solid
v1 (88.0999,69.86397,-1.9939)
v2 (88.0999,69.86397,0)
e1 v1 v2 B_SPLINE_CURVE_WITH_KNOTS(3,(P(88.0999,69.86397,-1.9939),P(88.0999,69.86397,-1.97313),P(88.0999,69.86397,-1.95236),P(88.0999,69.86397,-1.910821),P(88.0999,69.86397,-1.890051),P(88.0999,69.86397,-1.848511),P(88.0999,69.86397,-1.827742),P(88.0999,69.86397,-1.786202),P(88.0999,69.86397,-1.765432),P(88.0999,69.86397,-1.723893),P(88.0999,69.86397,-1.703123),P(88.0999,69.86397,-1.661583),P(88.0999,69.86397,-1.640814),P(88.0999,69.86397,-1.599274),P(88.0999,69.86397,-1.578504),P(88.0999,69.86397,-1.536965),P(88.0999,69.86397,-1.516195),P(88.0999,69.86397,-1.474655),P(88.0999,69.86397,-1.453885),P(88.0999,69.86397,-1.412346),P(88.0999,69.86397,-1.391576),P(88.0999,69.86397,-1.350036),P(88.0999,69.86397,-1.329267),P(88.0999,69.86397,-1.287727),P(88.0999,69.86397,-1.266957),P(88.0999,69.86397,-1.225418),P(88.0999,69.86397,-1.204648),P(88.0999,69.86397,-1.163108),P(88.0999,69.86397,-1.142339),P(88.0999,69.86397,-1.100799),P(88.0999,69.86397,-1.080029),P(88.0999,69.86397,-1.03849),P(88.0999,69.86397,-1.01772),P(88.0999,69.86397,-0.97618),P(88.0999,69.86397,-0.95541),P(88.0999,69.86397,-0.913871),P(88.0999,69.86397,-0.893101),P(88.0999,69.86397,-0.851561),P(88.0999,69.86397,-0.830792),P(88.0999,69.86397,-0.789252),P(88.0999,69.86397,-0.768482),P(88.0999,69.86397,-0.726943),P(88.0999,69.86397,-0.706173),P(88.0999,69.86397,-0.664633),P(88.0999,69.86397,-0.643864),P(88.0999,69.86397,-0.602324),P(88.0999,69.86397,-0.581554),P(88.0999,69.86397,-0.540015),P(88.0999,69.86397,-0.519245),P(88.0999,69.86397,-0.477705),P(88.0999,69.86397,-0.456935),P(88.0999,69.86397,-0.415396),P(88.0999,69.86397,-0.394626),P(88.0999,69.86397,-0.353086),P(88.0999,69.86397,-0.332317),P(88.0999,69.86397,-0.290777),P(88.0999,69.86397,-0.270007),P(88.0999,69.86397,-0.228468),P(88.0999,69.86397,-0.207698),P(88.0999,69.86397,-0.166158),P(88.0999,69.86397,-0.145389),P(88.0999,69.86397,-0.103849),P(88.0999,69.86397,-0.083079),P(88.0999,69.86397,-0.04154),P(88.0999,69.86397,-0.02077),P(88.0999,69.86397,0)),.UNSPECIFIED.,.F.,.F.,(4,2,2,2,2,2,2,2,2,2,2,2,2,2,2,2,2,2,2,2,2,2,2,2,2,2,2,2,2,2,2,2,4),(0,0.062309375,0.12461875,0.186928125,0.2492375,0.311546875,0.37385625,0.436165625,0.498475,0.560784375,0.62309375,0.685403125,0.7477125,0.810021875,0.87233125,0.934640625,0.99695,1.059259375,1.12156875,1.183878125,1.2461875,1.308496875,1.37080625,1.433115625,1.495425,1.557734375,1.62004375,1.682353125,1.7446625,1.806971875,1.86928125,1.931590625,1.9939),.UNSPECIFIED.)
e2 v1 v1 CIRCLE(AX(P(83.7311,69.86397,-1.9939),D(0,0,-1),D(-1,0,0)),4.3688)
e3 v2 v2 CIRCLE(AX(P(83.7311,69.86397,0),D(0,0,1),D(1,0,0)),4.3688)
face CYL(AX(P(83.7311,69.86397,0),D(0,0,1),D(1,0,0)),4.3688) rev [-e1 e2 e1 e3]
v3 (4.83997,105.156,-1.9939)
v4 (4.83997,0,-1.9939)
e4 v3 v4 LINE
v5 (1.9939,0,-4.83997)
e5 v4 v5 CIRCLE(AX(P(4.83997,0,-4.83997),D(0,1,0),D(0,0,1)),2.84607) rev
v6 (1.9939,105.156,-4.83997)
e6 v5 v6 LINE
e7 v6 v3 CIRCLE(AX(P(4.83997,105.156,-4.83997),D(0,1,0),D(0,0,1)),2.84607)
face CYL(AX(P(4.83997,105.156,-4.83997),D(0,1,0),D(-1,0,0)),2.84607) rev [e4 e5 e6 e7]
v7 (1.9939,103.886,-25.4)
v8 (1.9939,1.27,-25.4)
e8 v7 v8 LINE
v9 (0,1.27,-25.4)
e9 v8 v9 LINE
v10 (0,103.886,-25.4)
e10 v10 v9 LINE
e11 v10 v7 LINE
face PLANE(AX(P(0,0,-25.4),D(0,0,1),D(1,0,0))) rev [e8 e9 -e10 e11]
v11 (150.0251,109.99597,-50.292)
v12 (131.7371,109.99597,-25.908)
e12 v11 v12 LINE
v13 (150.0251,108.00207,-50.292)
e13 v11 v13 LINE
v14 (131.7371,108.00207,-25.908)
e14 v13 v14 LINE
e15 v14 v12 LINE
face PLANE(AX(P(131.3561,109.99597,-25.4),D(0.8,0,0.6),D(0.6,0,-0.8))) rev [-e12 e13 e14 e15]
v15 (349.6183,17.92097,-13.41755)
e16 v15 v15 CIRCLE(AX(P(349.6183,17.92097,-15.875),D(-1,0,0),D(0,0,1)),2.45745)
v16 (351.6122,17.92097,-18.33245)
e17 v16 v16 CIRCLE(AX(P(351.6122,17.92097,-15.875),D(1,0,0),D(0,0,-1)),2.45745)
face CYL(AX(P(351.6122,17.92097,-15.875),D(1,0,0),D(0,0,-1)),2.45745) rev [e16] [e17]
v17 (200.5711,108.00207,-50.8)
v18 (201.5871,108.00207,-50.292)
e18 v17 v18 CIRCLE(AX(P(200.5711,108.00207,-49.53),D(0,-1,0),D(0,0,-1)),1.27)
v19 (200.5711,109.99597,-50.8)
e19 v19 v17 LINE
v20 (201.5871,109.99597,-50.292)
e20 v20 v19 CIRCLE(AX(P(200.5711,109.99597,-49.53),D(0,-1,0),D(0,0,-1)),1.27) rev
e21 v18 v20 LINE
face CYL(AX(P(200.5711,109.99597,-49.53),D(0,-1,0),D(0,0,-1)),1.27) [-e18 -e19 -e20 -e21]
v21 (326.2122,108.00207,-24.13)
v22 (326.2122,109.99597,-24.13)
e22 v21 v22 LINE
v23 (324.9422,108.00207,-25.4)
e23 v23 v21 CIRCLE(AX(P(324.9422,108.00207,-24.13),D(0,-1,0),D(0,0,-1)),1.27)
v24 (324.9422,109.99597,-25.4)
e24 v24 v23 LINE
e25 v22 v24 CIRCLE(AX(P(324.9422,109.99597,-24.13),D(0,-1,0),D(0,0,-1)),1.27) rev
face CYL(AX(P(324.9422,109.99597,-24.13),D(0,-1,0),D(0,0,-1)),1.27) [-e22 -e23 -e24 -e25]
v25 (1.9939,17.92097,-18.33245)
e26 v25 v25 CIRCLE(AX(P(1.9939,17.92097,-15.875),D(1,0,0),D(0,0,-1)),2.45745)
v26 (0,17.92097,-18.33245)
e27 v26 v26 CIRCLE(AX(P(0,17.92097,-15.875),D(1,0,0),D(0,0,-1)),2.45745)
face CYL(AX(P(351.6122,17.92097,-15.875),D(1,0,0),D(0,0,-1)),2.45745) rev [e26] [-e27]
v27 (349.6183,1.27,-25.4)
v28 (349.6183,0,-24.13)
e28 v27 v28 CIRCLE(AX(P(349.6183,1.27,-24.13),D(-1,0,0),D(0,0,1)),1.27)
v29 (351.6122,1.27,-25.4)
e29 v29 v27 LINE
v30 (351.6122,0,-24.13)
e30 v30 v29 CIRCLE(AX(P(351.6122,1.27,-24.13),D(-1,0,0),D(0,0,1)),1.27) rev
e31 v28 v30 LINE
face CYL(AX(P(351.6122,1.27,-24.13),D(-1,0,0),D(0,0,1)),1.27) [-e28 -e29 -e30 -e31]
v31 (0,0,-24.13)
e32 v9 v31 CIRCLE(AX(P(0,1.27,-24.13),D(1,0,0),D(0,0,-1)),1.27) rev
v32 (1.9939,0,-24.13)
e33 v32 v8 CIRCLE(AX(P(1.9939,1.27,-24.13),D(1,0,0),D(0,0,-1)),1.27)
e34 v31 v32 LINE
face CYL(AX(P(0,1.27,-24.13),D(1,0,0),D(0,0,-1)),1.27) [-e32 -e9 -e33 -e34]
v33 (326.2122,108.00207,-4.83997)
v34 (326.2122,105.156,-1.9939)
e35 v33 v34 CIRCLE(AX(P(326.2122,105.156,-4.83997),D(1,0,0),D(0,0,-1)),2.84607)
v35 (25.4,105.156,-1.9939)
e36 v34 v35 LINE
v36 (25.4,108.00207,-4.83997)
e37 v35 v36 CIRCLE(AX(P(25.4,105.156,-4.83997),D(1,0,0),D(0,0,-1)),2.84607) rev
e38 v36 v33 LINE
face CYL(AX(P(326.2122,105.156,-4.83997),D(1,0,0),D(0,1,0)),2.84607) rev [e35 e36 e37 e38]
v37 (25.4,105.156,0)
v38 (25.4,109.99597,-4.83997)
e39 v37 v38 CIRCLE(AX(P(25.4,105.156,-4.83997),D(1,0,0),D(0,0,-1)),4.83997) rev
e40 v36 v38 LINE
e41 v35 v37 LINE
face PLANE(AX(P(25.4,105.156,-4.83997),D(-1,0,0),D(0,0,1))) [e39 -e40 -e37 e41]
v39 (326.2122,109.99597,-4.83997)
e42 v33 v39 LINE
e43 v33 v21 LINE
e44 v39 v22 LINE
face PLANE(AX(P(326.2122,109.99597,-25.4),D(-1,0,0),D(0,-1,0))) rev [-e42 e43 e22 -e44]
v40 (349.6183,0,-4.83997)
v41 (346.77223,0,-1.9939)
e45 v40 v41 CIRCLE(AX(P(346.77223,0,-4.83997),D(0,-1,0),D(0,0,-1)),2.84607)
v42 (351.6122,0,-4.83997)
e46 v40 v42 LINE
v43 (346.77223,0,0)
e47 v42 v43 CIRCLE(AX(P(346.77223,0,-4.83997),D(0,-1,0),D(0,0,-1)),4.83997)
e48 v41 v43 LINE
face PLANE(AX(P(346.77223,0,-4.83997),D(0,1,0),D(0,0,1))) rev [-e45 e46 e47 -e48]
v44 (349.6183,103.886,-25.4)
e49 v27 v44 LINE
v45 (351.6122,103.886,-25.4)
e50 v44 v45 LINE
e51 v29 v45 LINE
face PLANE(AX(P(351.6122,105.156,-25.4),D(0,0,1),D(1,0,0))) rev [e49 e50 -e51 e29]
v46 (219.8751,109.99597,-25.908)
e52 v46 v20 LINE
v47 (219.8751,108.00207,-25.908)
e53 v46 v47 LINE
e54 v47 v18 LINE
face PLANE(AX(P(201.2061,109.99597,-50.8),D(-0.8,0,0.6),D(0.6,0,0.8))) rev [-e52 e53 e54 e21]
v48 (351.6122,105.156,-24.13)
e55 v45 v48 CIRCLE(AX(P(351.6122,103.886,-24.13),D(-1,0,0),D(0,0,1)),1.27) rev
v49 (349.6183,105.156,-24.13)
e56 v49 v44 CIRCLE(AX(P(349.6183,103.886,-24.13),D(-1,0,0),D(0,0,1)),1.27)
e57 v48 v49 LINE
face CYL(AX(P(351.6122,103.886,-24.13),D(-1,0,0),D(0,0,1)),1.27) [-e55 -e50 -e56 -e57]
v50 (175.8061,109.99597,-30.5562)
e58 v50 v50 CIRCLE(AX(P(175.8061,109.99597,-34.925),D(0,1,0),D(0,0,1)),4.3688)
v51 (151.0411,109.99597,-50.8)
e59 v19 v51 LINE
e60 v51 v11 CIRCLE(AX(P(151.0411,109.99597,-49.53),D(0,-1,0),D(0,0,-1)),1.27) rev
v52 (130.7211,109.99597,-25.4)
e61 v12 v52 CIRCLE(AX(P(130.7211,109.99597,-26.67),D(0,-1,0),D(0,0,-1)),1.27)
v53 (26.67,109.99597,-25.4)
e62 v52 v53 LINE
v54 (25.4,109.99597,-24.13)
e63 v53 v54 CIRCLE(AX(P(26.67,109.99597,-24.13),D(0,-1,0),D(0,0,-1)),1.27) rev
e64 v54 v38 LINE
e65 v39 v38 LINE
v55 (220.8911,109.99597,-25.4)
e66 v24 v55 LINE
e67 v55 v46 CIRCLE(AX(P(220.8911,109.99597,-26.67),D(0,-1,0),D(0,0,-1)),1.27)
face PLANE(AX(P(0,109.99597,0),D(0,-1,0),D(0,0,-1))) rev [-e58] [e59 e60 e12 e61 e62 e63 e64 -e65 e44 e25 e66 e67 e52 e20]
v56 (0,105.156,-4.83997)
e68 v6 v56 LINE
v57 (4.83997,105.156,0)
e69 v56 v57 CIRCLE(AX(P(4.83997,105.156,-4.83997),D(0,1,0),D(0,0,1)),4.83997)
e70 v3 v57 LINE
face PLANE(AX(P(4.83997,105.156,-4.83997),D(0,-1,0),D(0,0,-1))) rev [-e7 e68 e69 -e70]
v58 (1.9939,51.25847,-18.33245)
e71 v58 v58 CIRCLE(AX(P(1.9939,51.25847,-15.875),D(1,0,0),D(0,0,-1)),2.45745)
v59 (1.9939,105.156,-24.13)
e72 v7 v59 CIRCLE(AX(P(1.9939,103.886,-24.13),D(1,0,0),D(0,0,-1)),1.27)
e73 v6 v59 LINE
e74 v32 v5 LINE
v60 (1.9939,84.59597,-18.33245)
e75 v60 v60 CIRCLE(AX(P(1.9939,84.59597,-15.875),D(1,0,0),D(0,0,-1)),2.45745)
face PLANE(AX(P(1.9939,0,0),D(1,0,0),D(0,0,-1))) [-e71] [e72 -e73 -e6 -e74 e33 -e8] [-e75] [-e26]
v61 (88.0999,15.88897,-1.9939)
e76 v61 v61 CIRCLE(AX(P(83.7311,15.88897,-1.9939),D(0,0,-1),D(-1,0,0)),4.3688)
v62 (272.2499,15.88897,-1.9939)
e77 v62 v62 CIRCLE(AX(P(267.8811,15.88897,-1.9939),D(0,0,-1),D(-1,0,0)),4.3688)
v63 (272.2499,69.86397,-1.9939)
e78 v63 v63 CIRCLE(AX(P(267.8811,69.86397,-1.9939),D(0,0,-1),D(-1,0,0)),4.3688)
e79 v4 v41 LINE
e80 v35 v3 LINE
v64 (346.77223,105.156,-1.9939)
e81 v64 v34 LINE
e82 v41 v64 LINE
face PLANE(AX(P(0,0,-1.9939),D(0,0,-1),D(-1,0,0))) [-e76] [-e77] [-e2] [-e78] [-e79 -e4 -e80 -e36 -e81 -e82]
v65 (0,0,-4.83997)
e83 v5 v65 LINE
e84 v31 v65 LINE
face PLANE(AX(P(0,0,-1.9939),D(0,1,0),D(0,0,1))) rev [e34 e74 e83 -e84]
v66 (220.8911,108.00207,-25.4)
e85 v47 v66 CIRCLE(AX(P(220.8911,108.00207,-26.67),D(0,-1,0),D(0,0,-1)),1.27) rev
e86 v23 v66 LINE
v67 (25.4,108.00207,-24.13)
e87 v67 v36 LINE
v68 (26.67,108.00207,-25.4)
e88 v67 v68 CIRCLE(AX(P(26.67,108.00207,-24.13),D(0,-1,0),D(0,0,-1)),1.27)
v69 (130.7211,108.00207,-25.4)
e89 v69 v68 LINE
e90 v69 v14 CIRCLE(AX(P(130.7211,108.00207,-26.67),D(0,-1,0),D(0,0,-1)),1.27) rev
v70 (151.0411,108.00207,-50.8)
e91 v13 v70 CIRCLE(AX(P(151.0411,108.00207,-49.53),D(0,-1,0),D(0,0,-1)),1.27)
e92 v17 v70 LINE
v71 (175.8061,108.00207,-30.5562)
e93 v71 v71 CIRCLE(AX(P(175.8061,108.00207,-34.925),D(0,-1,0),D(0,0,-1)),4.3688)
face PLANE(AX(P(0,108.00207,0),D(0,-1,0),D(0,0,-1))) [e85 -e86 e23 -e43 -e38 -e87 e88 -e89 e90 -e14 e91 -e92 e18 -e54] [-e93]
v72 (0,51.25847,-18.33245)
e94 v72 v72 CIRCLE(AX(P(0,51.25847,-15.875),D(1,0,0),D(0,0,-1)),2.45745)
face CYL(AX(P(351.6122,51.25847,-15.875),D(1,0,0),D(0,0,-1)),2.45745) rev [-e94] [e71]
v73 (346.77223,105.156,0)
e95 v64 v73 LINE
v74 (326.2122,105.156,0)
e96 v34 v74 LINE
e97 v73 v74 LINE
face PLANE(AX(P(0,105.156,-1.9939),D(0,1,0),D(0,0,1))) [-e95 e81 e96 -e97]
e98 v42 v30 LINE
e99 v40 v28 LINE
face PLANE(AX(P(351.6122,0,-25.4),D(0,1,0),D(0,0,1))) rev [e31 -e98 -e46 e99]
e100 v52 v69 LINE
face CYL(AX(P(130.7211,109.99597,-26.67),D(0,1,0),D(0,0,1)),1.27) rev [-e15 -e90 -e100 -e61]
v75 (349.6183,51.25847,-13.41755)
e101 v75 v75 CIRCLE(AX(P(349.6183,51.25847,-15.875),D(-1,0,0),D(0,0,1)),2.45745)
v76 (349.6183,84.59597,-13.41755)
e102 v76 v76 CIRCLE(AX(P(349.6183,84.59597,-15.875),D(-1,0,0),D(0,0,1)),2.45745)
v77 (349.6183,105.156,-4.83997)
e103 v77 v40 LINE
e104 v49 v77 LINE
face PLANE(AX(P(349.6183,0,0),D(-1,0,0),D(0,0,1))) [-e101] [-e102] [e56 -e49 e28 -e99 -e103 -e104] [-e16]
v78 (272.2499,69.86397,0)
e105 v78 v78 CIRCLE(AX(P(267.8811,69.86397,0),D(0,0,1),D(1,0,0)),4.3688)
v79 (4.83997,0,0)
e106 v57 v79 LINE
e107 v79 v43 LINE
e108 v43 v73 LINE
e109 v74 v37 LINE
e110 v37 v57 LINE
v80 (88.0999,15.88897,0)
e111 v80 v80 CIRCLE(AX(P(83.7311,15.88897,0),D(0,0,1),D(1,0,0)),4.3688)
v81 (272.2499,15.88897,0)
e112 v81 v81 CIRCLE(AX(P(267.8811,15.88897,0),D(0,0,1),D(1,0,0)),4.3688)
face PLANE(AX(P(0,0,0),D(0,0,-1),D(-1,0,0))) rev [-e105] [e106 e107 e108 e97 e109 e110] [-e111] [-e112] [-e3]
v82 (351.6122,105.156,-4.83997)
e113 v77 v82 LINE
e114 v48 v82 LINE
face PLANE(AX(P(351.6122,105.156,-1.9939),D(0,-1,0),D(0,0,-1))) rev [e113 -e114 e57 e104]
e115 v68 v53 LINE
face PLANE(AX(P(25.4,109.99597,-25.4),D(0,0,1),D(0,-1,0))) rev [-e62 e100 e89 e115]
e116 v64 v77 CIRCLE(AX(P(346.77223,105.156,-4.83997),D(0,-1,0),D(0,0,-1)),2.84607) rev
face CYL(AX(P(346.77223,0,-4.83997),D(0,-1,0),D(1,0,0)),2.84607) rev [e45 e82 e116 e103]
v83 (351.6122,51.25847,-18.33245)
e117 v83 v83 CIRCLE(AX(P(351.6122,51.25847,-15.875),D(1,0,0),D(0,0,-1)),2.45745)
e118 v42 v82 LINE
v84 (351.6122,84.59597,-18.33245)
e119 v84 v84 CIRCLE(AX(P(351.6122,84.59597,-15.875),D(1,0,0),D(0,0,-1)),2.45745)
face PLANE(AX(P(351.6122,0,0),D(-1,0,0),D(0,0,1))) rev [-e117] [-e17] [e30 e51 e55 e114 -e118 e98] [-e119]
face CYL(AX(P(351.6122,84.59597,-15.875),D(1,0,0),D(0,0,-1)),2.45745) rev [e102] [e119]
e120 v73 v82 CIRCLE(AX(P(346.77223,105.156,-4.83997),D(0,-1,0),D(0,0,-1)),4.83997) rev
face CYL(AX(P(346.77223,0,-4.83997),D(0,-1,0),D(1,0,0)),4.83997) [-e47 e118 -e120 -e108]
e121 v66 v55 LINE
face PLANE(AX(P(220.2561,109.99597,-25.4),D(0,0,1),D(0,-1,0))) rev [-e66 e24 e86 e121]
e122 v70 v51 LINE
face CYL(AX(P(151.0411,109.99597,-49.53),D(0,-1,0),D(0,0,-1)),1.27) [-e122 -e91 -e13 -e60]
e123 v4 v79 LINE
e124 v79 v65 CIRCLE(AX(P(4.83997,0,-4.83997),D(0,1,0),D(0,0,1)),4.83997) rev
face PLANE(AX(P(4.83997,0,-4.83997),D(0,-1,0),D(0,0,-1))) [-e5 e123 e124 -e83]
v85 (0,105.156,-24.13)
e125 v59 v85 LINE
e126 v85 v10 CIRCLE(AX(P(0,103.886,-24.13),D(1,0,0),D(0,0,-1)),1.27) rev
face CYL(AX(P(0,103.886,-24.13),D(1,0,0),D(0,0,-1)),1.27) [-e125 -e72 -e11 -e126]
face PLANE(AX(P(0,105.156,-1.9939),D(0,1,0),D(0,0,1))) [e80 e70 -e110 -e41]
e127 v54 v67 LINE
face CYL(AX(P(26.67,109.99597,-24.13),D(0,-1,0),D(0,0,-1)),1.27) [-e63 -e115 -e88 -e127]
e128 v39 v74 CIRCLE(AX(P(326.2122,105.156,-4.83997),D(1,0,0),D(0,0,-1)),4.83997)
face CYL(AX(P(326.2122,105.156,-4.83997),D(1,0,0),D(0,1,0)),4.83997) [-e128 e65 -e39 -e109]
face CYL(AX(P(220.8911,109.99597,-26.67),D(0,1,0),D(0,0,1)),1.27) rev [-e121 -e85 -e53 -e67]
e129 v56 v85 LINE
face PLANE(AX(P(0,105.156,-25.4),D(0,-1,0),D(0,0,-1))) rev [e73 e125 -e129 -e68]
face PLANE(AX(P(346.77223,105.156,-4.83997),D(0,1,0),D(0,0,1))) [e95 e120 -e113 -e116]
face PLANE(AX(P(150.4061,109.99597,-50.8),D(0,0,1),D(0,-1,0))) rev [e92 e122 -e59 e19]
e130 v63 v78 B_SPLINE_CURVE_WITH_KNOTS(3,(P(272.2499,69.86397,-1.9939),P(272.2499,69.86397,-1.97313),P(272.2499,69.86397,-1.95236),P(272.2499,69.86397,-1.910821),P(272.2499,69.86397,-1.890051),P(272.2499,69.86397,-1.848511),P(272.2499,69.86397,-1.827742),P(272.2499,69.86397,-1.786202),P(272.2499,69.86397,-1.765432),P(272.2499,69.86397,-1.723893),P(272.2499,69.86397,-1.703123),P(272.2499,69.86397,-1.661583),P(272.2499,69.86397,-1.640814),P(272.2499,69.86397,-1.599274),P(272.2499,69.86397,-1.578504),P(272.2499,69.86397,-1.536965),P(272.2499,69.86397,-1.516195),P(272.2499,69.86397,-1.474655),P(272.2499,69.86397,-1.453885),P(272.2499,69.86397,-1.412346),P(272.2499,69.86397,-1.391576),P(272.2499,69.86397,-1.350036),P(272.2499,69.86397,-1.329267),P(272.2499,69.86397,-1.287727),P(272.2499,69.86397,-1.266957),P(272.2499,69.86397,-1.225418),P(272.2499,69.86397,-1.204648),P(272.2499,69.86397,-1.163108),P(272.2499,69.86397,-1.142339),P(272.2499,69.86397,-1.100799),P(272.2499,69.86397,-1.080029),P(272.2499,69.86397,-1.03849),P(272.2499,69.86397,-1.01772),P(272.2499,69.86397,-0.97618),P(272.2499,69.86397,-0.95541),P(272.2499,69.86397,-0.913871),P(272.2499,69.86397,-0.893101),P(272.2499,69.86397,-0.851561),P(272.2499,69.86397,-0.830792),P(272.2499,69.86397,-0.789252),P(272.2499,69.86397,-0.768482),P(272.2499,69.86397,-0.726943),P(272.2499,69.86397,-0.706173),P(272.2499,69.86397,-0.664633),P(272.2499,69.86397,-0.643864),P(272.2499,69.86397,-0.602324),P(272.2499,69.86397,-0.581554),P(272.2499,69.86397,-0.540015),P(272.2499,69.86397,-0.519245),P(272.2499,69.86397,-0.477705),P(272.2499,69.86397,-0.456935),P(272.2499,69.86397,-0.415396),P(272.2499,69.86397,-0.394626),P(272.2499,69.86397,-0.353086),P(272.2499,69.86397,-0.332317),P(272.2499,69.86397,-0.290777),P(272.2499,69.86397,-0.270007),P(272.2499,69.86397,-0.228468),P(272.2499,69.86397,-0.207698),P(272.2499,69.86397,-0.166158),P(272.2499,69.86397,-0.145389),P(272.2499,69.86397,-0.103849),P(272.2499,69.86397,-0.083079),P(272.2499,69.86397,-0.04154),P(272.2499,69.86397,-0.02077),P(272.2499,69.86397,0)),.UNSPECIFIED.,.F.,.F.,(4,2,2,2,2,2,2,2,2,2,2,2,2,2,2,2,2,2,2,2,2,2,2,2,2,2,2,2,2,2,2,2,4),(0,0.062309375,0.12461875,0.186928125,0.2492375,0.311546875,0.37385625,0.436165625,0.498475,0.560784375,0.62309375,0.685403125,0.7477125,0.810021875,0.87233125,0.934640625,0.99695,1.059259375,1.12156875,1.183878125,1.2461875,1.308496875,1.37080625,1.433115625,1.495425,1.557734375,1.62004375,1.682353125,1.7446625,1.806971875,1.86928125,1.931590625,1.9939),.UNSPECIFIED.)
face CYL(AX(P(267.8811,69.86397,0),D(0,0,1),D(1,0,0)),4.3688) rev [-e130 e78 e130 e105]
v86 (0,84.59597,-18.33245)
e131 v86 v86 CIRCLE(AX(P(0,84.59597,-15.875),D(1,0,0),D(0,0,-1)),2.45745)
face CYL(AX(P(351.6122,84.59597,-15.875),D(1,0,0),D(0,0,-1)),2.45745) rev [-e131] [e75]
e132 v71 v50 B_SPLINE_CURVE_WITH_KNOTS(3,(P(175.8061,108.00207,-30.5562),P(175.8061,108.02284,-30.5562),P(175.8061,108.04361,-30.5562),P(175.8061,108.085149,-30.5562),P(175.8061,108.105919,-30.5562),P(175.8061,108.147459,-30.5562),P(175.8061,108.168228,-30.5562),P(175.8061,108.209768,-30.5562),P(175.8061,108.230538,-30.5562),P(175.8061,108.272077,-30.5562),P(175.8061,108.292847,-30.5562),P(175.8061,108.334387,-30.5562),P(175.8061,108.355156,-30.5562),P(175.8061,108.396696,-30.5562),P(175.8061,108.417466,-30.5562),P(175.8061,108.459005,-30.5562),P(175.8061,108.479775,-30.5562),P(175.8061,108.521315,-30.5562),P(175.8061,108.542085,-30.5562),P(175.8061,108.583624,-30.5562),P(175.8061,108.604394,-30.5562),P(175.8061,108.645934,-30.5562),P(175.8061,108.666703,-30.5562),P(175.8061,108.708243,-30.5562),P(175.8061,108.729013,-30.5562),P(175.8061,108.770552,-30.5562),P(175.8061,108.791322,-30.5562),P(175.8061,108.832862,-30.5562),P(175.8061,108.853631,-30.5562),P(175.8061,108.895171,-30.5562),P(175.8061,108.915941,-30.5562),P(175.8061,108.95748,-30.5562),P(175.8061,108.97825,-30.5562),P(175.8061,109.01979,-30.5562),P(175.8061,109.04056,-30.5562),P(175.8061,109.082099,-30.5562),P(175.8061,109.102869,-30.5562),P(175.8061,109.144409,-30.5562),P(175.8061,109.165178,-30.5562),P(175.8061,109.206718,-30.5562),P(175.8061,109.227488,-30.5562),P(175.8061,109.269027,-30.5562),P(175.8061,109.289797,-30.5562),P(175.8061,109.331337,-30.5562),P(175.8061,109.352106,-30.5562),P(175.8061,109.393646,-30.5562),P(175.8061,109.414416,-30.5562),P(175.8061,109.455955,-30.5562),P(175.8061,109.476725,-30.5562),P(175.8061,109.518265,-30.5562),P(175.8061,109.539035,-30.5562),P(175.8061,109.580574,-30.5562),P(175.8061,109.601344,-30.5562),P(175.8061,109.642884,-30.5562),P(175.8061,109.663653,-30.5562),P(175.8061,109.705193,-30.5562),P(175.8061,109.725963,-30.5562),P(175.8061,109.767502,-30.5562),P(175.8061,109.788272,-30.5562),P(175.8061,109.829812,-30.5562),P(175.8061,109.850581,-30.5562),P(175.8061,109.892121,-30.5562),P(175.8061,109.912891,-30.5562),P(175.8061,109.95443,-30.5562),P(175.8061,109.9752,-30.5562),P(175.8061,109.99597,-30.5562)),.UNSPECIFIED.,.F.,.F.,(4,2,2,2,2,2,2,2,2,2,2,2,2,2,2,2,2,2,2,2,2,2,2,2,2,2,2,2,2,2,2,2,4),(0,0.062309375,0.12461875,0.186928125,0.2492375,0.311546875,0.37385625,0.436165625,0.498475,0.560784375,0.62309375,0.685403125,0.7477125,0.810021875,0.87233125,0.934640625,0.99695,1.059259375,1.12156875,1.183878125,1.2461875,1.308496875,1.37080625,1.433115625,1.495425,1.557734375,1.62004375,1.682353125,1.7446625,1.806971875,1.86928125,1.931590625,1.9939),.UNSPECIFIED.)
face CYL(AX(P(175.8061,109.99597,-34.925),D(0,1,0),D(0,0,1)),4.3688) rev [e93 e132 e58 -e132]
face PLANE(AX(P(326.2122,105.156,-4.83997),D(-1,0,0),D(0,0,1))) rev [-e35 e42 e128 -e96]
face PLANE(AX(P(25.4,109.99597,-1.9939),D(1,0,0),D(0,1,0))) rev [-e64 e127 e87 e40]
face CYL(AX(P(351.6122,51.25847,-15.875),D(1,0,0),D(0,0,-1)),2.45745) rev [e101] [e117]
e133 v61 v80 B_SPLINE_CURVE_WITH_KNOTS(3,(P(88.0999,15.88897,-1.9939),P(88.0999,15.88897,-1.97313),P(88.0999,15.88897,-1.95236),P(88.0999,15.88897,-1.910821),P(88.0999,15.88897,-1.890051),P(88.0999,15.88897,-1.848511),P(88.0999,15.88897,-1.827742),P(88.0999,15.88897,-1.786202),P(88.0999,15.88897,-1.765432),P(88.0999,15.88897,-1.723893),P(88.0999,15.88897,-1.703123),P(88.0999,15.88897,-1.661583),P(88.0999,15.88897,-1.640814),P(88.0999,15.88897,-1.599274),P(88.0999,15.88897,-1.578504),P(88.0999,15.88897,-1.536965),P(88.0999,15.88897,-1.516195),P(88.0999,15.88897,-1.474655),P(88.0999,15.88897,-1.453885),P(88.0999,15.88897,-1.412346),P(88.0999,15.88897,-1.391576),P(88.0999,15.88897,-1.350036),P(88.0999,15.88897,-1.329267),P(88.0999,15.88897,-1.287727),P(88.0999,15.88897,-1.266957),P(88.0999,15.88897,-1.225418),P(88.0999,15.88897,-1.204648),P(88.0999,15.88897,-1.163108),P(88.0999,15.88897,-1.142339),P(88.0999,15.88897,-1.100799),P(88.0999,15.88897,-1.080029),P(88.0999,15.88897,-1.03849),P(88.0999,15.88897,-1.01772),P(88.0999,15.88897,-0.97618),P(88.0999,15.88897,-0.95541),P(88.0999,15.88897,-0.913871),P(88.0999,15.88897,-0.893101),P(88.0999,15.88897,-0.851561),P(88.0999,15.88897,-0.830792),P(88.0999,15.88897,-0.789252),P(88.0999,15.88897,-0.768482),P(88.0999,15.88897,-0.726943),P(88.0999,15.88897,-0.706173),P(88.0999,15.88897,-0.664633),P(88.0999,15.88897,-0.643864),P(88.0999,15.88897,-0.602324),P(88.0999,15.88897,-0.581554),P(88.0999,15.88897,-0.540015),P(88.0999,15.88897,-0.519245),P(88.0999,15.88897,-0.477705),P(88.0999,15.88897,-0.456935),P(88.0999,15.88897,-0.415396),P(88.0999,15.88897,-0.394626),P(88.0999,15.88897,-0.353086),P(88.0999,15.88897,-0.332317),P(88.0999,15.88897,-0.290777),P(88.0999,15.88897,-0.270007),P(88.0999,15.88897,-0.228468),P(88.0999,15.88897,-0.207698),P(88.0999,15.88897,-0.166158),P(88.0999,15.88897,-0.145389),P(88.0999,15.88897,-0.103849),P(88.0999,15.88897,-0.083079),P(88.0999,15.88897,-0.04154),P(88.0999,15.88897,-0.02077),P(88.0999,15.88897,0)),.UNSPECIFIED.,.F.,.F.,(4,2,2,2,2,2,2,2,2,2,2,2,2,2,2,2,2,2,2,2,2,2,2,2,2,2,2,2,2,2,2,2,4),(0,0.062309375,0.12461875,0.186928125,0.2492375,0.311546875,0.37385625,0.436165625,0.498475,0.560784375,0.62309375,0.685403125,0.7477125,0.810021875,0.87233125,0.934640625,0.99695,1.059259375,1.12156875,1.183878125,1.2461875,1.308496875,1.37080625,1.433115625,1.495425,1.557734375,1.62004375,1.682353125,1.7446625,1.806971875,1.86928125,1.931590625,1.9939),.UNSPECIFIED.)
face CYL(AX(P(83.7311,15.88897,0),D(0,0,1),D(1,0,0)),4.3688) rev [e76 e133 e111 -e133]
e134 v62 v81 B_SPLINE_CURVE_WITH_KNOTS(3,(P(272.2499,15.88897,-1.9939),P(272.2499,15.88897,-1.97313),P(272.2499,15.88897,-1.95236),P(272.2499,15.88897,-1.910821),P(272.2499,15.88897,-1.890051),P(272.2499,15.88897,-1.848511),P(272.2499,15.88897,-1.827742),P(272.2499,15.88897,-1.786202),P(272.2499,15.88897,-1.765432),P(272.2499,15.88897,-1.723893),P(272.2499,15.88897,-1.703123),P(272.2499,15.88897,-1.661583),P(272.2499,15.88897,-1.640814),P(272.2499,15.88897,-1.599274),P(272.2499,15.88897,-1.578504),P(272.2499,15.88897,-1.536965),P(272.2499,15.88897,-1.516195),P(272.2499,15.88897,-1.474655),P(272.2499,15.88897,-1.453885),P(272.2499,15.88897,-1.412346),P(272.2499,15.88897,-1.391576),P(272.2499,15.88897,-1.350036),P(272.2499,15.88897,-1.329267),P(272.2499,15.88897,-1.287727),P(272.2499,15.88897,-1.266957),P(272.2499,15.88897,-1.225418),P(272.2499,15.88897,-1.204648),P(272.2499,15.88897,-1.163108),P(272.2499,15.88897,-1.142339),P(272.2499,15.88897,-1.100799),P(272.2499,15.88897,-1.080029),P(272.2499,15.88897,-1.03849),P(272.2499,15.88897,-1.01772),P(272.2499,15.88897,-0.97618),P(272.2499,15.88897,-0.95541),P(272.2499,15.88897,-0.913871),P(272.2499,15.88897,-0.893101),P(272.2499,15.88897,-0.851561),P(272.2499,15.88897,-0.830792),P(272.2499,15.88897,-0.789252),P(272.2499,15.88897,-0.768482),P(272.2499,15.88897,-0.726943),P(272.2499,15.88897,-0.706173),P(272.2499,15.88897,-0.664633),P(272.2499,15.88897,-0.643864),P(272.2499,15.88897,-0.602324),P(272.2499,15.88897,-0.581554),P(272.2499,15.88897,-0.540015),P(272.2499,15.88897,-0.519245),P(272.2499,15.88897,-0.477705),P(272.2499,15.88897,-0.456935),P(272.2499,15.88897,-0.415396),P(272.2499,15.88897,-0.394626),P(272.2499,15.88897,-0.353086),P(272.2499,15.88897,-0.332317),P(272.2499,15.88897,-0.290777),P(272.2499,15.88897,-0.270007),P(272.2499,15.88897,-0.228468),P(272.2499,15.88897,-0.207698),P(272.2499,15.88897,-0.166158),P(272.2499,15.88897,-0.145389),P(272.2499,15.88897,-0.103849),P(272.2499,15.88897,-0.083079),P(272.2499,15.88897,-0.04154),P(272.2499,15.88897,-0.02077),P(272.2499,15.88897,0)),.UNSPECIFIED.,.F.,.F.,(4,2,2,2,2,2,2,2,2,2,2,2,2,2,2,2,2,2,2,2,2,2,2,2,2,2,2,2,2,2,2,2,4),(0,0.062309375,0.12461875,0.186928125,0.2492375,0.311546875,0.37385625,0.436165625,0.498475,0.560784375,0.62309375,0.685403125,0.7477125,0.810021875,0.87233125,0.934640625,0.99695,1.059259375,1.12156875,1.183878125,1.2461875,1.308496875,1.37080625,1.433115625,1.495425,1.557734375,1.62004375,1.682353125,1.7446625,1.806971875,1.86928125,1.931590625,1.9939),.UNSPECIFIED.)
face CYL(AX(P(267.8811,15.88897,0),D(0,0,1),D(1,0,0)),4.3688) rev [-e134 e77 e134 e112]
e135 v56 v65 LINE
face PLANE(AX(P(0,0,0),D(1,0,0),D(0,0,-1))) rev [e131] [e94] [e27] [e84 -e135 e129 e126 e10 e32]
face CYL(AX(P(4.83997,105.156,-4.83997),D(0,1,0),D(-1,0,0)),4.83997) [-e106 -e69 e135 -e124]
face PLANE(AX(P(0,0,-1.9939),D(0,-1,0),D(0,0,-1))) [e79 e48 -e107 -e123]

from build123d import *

# Parameters (mm, degrees)
SKETCH1_W                                 = 351.6122
SKETCH1_H                                 = 105.156
BASE_FLANGE1_DEPTH                        = 1.9939
EDGE_FLANGE1_STRIP_W                      = 13.66774
EDGE_FLANGE1_STRIP_H                      = 1.9939
EDGE_FLANGE1_STRIP_CUT_DEPTH              = 105.156
EDGE_FLANGE1_STRIP_2_W                    = 13.66774
EDGE_FLANGE1_STRIP_2_H                    = 1.9939
EDGE_FLANGE1_STRIP_CUT_2_DEPTH            = 105.156
EDGE_FLANGE1_DEPTH                        = 105.156
EDGE_FLANGE1_BEND_DEPTH                   = 105.156
EDGE_FLANGE2_DEPTH                        = 300.8122
EDGE_FLANGE2_START                        = 1.9939
EDGE_FLANGE2_FLAT_DEPTH                   = 1.9939
F_0_221_DIAMETER_HOLE1_D                  = 4.9149
HOLE_FOR_1_4_SELF_CLINCHING_NUTS_S_SS_C_D = 8.7376
HOLE_FOR_1_4_SELF_CLINCHING_NUTS_S_2_D    = 8.7376
FILLET1_R                                 = 1.27


# Sheet-metal steps are written as plain solids
with BuildPart() as part:
    # Sketch1 → Base-Flange1 (new body)
    with BuildSketch(Plane.XY):
        with Locations((175.8061, 52.578)):
            Rectangle(SKETCH1_W, SKETCH1_H)
    extrude(amount=-BASE_FLANGE1_DEPTH)

    # Edge-Flange1 strip (across the edge) → Edge-Flange1 strip cut (cut)
    with BuildSketch(Plane(origin=(0, 0, -1.9939), x_dir=(1, 0, 0), z_dir=(0, 1, 0))):
        with Locations((-1.9939, -0.99695)):
            Rectangle(EDGE_FLANGE1_STRIP_W, EDGE_FLANGE1_STRIP_H)
    extrude(amount=EDGE_FLANGE1_STRIP_CUT_DEPTH, mode=Mode.SUBTRACT)

    # Edge-Flange1 strip 2 (across the edge) → Edge-Flange1 strip cut 2 (cut)
    with BuildSketch(Plane(origin=(351.6122, 105.156, -1.9939), x_dir=(-1, 0, 0), z_dir=(0, -1, 0))):
        with Locations((-1.9939, -0.99695)):
            Rectangle(EDGE_FLANGE1_STRIP_2_W, EDGE_FLANGE1_STRIP_2_H)
    extrude(amount=EDGE_FLANGE1_STRIP_CUT_2_DEPTH, mode=Mode.SUBTRACT)

    # Edge-Flange1 section (across the edge) → Edge-Flange1 (add)
    with BuildSketch(Plane(origin=(0, 0, -1.9939), x_dir=(1, 0, 0), z_dir=(0, 1, 0))):
        with BuildLine():
            Line((0, 2.84607), (0, 23.4061))
            Line((0, 23.4061), (1.9939, 23.4061))
            Line((1.9939, 23.4061), (1.9939, 2.84607))
            ThreePointArc((1.9939, 2.84607), (2.827494603, 0.833594603), (4.83997, 0))
            Line((4.83997, 0), (4.83997, -1.9939))
            ThreePointArc((4.83997, -1.9939), (1.417594392, -0.576305608), (0, 2.84607))
        make_face()
    extrude(amount=EDGE_FLANGE1_DEPTH)

    # Edge-Flange1 section 2 (across the edge) → Edge-Flange1 bend (add)
    with BuildSketch(Plane(origin=(351.6122, 105.156, -1.9939), x_dir=(-1, 0, 0), z_dir=(0, -1, 0))):
        with BuildLine():
            Line((0, 2.84607), (0, 23.4061))
            Line((0, 23.4061), (1.9939, 23.4061))
            Line((1.9939, 23.4061), (1.9939, 2.84607))
            ThreePointArc((1.9939, 2.84607), (2.827494603, 0.833594603), (4.83997, 0))
            Line((4.83997, 0), (4.83997, -1.9939))
            ThreePointArc((4.83997, -1.9939), (1.417594392, -0.576305608), (0, 2.84607))
        make_face()
    extrude(amount=EDGE_FLANGE1_BEND_DEPTH)

    # Edge-Flange2 bend section (across the edge) → Edge-Flange2 (add)
    with BuildSketch(Plane(origin=(25.4, 108.00207, -1.9939), x_dir=(0, -1, 0), z_dir=(1, 0, 0))):
        with BuildLine():
            Line((-1.9939, 2.84607), (0, 2.84607))
            ThreePointArc((0, 2.84607), (0.833594603, 0.833594603), (2.84607, 0))
            Line((2.84607, 0), (2.84607, -1.9939))
            ThreePointArc((2.84607, -1.9939), (-0.576305608, -0.576305608), (-1.9939, 2.84607))
        make_face()
    extrude(amount=EDGE_FLANGE2_DEPTH)

    # Edge-Flange2 profile (on flange) → Edge-Flange2 flat (add)
    with BuildSketch(Plane(origin=(0, 108.00207, -1.9939), x_dir=(1, 0, 0), z_dir=(0, 1, 0)).offset(EDGE_FLANGE2_START)):
        Polygon((326.2122, 2.84607), (326.2122, 23.4061), (220.2561, 23.4061), (201.2061, 48.8061), (150.4061, 48.8061), (131.3561, 23.4061), (25.4, 23.4061), (25.4, 2.84607), align=None)
    extrude(amount=-EDGE_FLANGE2_FLAT_DEPTH)

    # 0.221_ Diameter Hole1 (through all)
    with Locations(Plane(origin=(351.6122, 0, 0), x_dir=(0, 0, -1), z_dir=(1, 0, 0))):
        with Locations((15.875, 84.59597), (15.875, 17.92097), (15.875, 51.25847)):
            Hole(F_0_221_DIAMETER_HOLE1_D / 2)

    # Hole for 1_4 Self-clinching Nuts _S_SS_C (through all)
    with Locations(Plane(origin=(0, 109.99597, 0), x_dir=(1, 0, 0), z_dir=(0, 1, 0))):
        with Locations((175.8061, 34.925)):
            Hole(HOLE_FOR_1_4_SELF_CLINCHING_NUTS_S_SS_C_D / 2)

    # Hole for 1_4 Self-clinching Nuts _S_ 2 (through all)
    with Locations(Plane.XY):
        with Locations((83.7311, 69.86397), (83.7311, 15.88897), (267.8811, 15.88897), (267.8811, 69.86397)):
            Hole(HOLE_FOR_1_4_SELF_CLINCHING_NUTS_S_2_D / 2)

    # Fillet1
    fillet1_edges = [part.edges().sort_by_distance(p)[0] for p in [
        (0.99695, 0, -25.4),
        (0.99695, 105.156, -25.4),
        (350.61525, 105.156, -25.4),
        (350.61525, 0, -25.4),
        (25.4, 108.99902, -25.4),
        (326.2122, 108.99902, -25.4),
        (220.2561, 108.99902, -25.4),
        (201.2061, 108.99902, -50.8),
        (150.4061, 108.99902, -50.8),
        (131.3561, 108.99902, -25.4),
    ]]
    fillet(fillet1_edges, radius=FILLET1_R)


solid = part.part
